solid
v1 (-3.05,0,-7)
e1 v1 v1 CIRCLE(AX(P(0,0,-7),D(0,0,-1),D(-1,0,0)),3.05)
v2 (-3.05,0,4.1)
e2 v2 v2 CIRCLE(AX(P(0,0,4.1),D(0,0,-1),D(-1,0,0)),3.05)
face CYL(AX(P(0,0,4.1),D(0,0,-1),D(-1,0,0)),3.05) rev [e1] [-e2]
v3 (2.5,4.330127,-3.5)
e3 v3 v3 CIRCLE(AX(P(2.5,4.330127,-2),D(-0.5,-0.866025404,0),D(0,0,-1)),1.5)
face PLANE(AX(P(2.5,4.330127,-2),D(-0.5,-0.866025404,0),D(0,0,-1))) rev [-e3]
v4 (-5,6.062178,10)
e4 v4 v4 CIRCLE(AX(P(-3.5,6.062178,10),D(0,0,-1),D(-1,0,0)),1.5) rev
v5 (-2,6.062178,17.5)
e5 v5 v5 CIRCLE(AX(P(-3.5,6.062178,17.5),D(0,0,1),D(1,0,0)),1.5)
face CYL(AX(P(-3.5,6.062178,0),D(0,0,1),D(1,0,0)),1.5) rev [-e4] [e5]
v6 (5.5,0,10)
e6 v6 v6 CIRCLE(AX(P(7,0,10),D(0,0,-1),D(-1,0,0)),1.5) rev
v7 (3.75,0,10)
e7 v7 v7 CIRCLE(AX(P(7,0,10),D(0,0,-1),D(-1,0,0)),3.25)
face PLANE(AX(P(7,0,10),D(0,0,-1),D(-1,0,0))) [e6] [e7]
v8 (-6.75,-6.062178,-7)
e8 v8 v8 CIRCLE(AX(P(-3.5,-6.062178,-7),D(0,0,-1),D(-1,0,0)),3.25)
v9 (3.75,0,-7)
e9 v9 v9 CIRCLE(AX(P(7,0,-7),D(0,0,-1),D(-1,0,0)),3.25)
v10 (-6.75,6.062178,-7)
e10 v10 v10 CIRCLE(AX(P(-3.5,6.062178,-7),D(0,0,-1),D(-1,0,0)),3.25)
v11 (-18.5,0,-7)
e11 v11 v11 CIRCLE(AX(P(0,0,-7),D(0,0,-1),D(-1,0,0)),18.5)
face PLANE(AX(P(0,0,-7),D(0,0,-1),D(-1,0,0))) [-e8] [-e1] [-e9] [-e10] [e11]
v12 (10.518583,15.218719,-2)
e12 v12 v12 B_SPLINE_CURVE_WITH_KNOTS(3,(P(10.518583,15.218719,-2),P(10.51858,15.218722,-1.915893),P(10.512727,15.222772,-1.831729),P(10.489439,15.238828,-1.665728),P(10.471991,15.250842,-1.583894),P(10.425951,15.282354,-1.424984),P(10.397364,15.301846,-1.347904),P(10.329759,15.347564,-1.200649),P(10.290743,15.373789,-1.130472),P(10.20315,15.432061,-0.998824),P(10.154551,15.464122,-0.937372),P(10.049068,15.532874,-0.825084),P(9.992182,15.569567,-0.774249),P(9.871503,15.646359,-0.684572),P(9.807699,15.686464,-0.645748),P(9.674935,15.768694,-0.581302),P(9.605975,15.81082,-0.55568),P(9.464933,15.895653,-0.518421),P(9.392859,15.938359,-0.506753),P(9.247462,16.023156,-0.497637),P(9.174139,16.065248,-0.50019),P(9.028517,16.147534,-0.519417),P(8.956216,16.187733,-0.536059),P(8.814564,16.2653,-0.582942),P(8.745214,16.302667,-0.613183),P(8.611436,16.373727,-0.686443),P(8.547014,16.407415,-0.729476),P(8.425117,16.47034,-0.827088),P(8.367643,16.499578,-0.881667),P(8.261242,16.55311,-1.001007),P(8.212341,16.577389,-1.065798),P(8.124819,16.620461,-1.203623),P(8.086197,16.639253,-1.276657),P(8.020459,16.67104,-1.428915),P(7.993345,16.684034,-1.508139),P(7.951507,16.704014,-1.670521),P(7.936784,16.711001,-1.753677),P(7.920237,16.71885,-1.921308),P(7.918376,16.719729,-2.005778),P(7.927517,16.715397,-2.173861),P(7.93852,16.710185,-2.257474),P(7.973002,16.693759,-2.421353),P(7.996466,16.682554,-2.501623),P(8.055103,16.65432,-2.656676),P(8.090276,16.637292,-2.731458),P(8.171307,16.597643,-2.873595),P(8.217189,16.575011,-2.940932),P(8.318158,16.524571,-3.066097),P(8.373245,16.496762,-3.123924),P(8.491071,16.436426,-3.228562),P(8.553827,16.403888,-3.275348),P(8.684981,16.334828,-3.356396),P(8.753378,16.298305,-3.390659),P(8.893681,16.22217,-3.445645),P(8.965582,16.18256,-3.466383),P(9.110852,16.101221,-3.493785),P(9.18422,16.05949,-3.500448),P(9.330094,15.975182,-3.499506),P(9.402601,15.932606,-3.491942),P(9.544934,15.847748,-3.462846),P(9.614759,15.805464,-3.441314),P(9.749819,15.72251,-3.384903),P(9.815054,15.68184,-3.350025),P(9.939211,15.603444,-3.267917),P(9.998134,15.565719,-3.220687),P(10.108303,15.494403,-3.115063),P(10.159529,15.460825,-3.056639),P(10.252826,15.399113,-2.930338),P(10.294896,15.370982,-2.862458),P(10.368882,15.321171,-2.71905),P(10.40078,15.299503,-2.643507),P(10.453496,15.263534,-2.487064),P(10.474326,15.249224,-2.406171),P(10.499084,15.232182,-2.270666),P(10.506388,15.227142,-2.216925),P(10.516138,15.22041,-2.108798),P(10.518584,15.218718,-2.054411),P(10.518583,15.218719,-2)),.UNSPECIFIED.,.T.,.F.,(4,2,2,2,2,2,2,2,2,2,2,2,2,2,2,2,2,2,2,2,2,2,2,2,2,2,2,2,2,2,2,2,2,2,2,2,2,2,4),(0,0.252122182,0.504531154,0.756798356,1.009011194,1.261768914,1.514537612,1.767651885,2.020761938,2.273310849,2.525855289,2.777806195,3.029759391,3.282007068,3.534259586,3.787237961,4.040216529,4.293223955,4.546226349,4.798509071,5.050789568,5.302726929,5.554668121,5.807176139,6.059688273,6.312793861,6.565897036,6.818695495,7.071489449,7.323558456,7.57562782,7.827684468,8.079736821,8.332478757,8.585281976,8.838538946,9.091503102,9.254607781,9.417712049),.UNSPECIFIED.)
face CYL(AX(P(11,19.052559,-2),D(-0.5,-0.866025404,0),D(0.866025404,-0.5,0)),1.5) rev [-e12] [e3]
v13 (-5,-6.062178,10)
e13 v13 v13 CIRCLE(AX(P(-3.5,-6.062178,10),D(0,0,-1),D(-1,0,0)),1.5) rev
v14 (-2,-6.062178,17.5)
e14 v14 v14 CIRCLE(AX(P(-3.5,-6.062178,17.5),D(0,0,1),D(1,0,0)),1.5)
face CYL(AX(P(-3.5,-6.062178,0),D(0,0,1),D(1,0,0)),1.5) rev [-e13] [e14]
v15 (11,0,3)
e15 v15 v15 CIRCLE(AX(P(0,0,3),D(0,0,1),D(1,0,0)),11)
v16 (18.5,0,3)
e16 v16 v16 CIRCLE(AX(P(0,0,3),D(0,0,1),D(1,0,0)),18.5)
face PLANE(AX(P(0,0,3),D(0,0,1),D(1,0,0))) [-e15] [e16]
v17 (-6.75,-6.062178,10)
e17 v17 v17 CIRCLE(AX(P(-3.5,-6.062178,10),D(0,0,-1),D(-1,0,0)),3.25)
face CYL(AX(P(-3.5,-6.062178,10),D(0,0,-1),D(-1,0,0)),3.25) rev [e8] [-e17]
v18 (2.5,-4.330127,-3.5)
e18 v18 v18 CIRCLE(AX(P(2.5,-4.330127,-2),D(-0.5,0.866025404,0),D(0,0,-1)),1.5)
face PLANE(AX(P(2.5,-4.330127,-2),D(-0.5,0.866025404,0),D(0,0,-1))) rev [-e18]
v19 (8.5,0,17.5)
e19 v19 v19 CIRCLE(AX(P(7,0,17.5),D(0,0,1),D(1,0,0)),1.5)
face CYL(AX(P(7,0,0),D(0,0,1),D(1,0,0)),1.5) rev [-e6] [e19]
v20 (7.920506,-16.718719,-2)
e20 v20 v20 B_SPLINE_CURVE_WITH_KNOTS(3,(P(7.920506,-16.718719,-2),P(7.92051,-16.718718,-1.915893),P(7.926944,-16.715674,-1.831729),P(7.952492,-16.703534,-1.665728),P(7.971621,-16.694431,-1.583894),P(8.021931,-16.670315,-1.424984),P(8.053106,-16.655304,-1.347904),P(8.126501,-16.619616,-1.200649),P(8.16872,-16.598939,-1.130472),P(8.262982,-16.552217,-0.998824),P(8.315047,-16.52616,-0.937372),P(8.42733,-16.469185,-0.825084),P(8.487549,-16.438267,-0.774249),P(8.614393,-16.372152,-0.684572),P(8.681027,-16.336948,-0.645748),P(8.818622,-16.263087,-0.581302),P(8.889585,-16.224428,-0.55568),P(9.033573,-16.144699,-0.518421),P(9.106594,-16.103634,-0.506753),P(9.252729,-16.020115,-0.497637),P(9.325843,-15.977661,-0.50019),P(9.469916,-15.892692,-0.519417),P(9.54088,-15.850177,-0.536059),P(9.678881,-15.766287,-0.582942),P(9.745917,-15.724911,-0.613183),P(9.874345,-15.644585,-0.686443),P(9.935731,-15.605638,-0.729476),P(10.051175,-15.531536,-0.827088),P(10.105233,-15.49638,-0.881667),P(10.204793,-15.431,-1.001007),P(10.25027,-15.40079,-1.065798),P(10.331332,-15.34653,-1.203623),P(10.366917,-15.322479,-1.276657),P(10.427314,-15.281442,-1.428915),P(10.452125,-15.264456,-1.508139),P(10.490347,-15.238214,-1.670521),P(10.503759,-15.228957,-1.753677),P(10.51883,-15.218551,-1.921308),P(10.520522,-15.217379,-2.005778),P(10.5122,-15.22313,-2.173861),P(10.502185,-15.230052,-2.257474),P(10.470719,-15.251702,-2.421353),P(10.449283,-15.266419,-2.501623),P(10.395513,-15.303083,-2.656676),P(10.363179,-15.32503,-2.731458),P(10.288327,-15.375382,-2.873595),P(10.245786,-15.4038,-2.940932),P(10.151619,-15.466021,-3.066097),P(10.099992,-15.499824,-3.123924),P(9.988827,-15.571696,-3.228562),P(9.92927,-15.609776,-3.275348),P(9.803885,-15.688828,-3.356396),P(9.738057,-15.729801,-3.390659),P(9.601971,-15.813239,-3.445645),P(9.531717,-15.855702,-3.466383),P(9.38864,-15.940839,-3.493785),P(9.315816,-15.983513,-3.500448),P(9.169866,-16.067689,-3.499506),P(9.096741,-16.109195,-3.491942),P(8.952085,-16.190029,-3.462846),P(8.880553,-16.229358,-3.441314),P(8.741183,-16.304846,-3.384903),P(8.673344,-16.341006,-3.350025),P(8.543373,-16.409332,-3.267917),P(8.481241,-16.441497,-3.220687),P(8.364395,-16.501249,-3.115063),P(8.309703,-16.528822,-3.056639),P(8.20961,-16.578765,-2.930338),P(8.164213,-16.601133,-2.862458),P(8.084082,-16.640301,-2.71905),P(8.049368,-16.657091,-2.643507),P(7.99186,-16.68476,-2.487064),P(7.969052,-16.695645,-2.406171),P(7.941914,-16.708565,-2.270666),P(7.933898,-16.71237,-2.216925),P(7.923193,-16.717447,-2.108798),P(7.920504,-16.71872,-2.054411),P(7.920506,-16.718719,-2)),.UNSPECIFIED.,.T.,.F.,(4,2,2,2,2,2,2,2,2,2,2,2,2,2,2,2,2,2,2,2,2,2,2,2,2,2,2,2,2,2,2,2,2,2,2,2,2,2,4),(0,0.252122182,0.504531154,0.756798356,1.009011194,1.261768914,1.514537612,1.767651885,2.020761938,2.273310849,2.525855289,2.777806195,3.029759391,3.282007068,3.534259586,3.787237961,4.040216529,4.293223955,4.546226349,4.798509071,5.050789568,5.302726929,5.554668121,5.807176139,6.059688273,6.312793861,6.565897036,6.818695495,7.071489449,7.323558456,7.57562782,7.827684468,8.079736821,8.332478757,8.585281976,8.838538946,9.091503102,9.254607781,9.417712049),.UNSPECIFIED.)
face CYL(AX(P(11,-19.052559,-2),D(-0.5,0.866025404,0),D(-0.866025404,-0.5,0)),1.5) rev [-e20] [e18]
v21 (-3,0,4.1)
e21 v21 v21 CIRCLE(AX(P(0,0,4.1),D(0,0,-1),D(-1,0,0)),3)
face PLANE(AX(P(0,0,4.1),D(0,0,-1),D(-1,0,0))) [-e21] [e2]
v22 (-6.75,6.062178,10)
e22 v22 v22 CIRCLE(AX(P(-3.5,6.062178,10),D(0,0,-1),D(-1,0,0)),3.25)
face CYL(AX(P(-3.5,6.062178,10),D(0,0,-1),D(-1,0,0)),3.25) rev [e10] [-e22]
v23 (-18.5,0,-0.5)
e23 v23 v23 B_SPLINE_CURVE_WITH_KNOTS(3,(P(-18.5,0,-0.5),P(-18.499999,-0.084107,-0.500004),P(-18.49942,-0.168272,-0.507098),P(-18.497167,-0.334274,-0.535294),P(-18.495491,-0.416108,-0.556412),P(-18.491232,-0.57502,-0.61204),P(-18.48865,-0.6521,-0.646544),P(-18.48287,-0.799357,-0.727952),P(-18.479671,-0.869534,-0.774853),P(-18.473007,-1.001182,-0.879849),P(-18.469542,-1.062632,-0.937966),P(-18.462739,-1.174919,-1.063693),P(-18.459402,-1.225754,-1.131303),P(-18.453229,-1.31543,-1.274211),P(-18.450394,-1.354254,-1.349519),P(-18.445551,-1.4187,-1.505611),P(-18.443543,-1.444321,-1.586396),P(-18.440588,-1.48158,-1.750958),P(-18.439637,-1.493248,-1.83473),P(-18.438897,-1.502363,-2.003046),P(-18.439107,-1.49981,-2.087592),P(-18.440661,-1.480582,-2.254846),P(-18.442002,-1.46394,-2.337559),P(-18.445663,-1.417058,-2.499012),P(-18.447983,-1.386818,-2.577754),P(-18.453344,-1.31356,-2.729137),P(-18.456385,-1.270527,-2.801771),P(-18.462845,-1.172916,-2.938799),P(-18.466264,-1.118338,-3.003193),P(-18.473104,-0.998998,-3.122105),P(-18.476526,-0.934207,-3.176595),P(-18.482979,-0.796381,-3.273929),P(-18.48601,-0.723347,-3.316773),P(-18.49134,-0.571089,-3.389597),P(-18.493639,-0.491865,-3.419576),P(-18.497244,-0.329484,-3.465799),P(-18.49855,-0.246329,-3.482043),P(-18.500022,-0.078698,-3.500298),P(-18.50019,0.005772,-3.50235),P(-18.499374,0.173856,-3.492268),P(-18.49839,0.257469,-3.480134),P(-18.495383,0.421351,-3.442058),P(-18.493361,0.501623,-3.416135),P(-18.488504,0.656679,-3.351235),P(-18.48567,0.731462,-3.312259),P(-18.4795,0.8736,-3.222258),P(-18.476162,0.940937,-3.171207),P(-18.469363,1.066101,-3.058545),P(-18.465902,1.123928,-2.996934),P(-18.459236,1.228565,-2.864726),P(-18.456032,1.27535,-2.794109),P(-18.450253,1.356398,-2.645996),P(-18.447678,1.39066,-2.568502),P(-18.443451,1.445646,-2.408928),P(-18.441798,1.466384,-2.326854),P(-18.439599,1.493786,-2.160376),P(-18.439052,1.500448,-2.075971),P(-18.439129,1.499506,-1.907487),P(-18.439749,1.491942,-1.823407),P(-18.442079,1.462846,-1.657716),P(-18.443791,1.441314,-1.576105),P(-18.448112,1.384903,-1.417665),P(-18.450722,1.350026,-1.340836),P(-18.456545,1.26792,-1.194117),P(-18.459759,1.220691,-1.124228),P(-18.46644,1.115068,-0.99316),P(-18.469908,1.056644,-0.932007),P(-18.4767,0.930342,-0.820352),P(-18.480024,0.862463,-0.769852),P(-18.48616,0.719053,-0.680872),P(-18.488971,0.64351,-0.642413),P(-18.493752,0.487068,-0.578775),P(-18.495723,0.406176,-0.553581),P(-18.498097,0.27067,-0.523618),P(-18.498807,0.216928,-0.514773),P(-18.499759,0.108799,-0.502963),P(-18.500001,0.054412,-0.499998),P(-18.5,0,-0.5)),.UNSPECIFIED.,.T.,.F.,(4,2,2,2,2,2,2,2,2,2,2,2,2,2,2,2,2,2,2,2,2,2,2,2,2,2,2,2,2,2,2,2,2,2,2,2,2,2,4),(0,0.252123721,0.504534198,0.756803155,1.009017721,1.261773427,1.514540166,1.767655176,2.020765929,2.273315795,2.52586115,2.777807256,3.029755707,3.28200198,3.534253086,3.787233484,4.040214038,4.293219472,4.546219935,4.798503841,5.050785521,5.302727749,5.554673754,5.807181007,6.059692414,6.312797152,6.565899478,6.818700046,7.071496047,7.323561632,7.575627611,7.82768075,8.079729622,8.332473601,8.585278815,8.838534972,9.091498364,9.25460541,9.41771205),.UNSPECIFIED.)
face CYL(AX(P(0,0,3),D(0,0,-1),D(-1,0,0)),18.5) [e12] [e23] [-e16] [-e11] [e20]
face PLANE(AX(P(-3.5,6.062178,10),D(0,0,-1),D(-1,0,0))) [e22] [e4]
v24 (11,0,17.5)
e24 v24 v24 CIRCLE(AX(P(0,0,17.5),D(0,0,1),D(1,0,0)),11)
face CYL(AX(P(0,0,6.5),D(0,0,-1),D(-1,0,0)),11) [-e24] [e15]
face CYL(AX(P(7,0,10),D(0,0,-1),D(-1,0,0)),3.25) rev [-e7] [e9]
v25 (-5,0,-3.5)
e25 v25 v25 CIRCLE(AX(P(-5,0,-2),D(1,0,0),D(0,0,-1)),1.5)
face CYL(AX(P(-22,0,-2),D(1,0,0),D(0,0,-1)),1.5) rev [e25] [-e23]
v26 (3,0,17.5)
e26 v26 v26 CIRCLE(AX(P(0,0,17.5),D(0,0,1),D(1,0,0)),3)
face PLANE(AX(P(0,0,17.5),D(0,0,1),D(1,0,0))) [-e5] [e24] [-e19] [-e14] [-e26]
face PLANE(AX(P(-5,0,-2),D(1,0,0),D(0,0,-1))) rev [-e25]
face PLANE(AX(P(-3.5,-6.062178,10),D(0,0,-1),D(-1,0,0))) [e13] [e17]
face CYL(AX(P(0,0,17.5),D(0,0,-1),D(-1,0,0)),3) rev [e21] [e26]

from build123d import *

# Parameters (mm, degrees)
SKETCH1_R           = 18.5
BOSS_EXTRUDE1_DEPTH = 3
SKETCH2_R           = 11
BOSS_EXTRUDE2_DEPTH = 3.5
SKETCH4_R           = 3.05
CUT_EXTRUDE1_DEPTH  = 4.1
SKETCH5_R           = 1.5
CUT_EXTRUDE2_DEPTH  = 4
SKETCH7_R           = 11
SKETCH7_R_2         = 3
BOSS_EXTRUDE3_DEPTH = 11
SKETCH9_R           = 1.5
CUT_EXTRUDE4_DEPTH  = 32.476181471
SKETCH10_R          = 3
CUT_EXTRUDE5_DEPTH  = 32.476181471
SKETCH11_R          = 3.25
CUT_EXTRUDE8_DEPTH  = 10
BOSS_EXTRUDE4_START = 7
SKETCH12_R          = 18.5
SKETCH12_R_2        = 3.25
SKETCH12_R_3        = 3.05
BOSS_EXTRUDE4_DEPTH = 7
CUT_EXTRUDE9_START  = -5
SKETCH13_R          = 1.5
CUT_EXTRUDE9_DEPTH  = 17
CIRPATTERN1_COUNT   = 3


with BuildPart() as part:
    # Sketch1 → Boss-Extrude1 (new body)
    with BuildSketch(Plane.XY):
        Circle(SKETCH1_R)
    extrude(amount=BOSS_EXTRUDE1_DEPTH)

    # Sketch2 → Boss-Extrude2 (add)
    with BuildSketch(Plane.XY.offset(3)):
        Circle(SKETCH2_R)
    extrude(amount=BOSS_EXTRUDE2_DEPTH)

    # Sketch4 → Cut-Extrude1 (cut)
    with BuildSketch(Plane(origin=(0, 0, 0), x_dir=(-1, 0, 0), z_dir=(0, 0, -1))):
        Circle(SKETCH4_R)
    extrude(amount=-CUT_EXTRUDE1_DEPTH, mode=Mode.SUBTRACT)

    # Sketch5 → Cut-Extrude2 (cut)
    with BuildSketch(Plane(origin=(0, 0, 4.1), x_dir=(-1, 0, 0), z_dir=(0, 0, -1))):
        Circle(SKETCH5_R)
    extrude(amount=-CUT_EXTRUDE2_DEPTH, mode=Mode.SUBTRACT)

    # Sketch7 → Boss-Extrude3 (add)
    with BuildSketch(Plane.XY.offset(6.5)):
        Circle(SKETCH7_R)
        Circle(SKETCH7_R_2, mode=Mode.SUBTRACT)
    extrude(amount=BOSS_EXTRUDE3_DEPTH)

    # Sketch9 → Cut-Extrude4 (cut, through all)
    with BuildSketch(Plane.XY.offset(17.5)):
        with Locations((7, 0)):
            Circle(SKETCH9_R)
        with Locations((-3.5, -6.062177826)):
            Circle(SKETCH9_R)
        with Locations((-3.5, 6.062177826)):
            Circle(SKETCH9_R)
    extrude(amount=-CUT_EXTRUDE4_DEPTH, mode=Mode.SUBTRACT)

    # Sketch10 → Cut-Extrude5 (cut, through all)
    with BuildSketch(Plane.XY.offset(17.5)):
        Circle(SKETCH10_R)
    extrude(amount=-CUT_EXTRUDE5_DEPTH, mode=Mode.SUBTRACT)

    # Sketch11 → Cut-Extrude8 (cut)
    with BuildSketch(Plane(origin=(0, 0, 0), x_dir=(-1, 0, 0), z_dir=(0, 0, -1))):
        with Locations((3.5, -6.062177826)):
            Circle(SKETCH11_R)
        with Locations((3.5, 6.062177826)):
            Circle(SKETCH11_R)
        with Locations((-7, 0)):
            Circle(SKETCH11_R)
    extrude(amount=-CUT_EXTRUDE8_DEPTH, mode=Mode.SUBTRACT)

    # Sketch12 → Boss-Extrude4 (add)
    with BuildSketch(Plane(origin=(0, 0, 0), x_dir=(-1, 0, 0), z_dir=(0, 0, -1)).offset(BOSS_EXTRUDE4_START)):
        Circle(SKETCH12_R)
        with Locations((3.5, 6.062177826)):
            Circle(SKETCH12_R_2, mode=Mode.SUBTRACT)
        with Locations((3.5, -6.062177826)):
            Circle(SKETCH12_R_2, mode=Mode.SUBTRACT)
        with Locations((-7, 0)):
            Circle(SKETCH12_R_2, mode=Mode.SUBTRACT)
        Circle(SKETCH12_R_3, mode=Mode.SUBTRACT)
    extrude(amount=-BOSS_EXTRUDE4_DEPTH)

    # Sketch13 → Cut-Extrude9 (cut)
    with BuildSketch(Plane(origin=(0, 0, 0), x_dir=(0, 0, -1), z_dir=(1, 0, 0)).offset(CUT_EXTRUDE9_START)):
        with Locations((2, 0)):
            Circle(SKETCH13_R)
    cut_extrude9 = extrude(amount=-CUT_EXTRUDE9_DEPTH, mode=Mode.SUBTRACT)

    # CirPattern1: Cut-Extrude9 ×3 about axis
    cirpattern1_axis = Axis((0, 0, 3), (0, 0, -1))
    for i in range(1, CIRPATTERN1_COUNT):
        add(cut_extrude9.rotate(cirpattern1_axis, i * 360 / CIRPATTERN1_COUNT), mode=Mode.SUBTRACT)


solid = part.part
